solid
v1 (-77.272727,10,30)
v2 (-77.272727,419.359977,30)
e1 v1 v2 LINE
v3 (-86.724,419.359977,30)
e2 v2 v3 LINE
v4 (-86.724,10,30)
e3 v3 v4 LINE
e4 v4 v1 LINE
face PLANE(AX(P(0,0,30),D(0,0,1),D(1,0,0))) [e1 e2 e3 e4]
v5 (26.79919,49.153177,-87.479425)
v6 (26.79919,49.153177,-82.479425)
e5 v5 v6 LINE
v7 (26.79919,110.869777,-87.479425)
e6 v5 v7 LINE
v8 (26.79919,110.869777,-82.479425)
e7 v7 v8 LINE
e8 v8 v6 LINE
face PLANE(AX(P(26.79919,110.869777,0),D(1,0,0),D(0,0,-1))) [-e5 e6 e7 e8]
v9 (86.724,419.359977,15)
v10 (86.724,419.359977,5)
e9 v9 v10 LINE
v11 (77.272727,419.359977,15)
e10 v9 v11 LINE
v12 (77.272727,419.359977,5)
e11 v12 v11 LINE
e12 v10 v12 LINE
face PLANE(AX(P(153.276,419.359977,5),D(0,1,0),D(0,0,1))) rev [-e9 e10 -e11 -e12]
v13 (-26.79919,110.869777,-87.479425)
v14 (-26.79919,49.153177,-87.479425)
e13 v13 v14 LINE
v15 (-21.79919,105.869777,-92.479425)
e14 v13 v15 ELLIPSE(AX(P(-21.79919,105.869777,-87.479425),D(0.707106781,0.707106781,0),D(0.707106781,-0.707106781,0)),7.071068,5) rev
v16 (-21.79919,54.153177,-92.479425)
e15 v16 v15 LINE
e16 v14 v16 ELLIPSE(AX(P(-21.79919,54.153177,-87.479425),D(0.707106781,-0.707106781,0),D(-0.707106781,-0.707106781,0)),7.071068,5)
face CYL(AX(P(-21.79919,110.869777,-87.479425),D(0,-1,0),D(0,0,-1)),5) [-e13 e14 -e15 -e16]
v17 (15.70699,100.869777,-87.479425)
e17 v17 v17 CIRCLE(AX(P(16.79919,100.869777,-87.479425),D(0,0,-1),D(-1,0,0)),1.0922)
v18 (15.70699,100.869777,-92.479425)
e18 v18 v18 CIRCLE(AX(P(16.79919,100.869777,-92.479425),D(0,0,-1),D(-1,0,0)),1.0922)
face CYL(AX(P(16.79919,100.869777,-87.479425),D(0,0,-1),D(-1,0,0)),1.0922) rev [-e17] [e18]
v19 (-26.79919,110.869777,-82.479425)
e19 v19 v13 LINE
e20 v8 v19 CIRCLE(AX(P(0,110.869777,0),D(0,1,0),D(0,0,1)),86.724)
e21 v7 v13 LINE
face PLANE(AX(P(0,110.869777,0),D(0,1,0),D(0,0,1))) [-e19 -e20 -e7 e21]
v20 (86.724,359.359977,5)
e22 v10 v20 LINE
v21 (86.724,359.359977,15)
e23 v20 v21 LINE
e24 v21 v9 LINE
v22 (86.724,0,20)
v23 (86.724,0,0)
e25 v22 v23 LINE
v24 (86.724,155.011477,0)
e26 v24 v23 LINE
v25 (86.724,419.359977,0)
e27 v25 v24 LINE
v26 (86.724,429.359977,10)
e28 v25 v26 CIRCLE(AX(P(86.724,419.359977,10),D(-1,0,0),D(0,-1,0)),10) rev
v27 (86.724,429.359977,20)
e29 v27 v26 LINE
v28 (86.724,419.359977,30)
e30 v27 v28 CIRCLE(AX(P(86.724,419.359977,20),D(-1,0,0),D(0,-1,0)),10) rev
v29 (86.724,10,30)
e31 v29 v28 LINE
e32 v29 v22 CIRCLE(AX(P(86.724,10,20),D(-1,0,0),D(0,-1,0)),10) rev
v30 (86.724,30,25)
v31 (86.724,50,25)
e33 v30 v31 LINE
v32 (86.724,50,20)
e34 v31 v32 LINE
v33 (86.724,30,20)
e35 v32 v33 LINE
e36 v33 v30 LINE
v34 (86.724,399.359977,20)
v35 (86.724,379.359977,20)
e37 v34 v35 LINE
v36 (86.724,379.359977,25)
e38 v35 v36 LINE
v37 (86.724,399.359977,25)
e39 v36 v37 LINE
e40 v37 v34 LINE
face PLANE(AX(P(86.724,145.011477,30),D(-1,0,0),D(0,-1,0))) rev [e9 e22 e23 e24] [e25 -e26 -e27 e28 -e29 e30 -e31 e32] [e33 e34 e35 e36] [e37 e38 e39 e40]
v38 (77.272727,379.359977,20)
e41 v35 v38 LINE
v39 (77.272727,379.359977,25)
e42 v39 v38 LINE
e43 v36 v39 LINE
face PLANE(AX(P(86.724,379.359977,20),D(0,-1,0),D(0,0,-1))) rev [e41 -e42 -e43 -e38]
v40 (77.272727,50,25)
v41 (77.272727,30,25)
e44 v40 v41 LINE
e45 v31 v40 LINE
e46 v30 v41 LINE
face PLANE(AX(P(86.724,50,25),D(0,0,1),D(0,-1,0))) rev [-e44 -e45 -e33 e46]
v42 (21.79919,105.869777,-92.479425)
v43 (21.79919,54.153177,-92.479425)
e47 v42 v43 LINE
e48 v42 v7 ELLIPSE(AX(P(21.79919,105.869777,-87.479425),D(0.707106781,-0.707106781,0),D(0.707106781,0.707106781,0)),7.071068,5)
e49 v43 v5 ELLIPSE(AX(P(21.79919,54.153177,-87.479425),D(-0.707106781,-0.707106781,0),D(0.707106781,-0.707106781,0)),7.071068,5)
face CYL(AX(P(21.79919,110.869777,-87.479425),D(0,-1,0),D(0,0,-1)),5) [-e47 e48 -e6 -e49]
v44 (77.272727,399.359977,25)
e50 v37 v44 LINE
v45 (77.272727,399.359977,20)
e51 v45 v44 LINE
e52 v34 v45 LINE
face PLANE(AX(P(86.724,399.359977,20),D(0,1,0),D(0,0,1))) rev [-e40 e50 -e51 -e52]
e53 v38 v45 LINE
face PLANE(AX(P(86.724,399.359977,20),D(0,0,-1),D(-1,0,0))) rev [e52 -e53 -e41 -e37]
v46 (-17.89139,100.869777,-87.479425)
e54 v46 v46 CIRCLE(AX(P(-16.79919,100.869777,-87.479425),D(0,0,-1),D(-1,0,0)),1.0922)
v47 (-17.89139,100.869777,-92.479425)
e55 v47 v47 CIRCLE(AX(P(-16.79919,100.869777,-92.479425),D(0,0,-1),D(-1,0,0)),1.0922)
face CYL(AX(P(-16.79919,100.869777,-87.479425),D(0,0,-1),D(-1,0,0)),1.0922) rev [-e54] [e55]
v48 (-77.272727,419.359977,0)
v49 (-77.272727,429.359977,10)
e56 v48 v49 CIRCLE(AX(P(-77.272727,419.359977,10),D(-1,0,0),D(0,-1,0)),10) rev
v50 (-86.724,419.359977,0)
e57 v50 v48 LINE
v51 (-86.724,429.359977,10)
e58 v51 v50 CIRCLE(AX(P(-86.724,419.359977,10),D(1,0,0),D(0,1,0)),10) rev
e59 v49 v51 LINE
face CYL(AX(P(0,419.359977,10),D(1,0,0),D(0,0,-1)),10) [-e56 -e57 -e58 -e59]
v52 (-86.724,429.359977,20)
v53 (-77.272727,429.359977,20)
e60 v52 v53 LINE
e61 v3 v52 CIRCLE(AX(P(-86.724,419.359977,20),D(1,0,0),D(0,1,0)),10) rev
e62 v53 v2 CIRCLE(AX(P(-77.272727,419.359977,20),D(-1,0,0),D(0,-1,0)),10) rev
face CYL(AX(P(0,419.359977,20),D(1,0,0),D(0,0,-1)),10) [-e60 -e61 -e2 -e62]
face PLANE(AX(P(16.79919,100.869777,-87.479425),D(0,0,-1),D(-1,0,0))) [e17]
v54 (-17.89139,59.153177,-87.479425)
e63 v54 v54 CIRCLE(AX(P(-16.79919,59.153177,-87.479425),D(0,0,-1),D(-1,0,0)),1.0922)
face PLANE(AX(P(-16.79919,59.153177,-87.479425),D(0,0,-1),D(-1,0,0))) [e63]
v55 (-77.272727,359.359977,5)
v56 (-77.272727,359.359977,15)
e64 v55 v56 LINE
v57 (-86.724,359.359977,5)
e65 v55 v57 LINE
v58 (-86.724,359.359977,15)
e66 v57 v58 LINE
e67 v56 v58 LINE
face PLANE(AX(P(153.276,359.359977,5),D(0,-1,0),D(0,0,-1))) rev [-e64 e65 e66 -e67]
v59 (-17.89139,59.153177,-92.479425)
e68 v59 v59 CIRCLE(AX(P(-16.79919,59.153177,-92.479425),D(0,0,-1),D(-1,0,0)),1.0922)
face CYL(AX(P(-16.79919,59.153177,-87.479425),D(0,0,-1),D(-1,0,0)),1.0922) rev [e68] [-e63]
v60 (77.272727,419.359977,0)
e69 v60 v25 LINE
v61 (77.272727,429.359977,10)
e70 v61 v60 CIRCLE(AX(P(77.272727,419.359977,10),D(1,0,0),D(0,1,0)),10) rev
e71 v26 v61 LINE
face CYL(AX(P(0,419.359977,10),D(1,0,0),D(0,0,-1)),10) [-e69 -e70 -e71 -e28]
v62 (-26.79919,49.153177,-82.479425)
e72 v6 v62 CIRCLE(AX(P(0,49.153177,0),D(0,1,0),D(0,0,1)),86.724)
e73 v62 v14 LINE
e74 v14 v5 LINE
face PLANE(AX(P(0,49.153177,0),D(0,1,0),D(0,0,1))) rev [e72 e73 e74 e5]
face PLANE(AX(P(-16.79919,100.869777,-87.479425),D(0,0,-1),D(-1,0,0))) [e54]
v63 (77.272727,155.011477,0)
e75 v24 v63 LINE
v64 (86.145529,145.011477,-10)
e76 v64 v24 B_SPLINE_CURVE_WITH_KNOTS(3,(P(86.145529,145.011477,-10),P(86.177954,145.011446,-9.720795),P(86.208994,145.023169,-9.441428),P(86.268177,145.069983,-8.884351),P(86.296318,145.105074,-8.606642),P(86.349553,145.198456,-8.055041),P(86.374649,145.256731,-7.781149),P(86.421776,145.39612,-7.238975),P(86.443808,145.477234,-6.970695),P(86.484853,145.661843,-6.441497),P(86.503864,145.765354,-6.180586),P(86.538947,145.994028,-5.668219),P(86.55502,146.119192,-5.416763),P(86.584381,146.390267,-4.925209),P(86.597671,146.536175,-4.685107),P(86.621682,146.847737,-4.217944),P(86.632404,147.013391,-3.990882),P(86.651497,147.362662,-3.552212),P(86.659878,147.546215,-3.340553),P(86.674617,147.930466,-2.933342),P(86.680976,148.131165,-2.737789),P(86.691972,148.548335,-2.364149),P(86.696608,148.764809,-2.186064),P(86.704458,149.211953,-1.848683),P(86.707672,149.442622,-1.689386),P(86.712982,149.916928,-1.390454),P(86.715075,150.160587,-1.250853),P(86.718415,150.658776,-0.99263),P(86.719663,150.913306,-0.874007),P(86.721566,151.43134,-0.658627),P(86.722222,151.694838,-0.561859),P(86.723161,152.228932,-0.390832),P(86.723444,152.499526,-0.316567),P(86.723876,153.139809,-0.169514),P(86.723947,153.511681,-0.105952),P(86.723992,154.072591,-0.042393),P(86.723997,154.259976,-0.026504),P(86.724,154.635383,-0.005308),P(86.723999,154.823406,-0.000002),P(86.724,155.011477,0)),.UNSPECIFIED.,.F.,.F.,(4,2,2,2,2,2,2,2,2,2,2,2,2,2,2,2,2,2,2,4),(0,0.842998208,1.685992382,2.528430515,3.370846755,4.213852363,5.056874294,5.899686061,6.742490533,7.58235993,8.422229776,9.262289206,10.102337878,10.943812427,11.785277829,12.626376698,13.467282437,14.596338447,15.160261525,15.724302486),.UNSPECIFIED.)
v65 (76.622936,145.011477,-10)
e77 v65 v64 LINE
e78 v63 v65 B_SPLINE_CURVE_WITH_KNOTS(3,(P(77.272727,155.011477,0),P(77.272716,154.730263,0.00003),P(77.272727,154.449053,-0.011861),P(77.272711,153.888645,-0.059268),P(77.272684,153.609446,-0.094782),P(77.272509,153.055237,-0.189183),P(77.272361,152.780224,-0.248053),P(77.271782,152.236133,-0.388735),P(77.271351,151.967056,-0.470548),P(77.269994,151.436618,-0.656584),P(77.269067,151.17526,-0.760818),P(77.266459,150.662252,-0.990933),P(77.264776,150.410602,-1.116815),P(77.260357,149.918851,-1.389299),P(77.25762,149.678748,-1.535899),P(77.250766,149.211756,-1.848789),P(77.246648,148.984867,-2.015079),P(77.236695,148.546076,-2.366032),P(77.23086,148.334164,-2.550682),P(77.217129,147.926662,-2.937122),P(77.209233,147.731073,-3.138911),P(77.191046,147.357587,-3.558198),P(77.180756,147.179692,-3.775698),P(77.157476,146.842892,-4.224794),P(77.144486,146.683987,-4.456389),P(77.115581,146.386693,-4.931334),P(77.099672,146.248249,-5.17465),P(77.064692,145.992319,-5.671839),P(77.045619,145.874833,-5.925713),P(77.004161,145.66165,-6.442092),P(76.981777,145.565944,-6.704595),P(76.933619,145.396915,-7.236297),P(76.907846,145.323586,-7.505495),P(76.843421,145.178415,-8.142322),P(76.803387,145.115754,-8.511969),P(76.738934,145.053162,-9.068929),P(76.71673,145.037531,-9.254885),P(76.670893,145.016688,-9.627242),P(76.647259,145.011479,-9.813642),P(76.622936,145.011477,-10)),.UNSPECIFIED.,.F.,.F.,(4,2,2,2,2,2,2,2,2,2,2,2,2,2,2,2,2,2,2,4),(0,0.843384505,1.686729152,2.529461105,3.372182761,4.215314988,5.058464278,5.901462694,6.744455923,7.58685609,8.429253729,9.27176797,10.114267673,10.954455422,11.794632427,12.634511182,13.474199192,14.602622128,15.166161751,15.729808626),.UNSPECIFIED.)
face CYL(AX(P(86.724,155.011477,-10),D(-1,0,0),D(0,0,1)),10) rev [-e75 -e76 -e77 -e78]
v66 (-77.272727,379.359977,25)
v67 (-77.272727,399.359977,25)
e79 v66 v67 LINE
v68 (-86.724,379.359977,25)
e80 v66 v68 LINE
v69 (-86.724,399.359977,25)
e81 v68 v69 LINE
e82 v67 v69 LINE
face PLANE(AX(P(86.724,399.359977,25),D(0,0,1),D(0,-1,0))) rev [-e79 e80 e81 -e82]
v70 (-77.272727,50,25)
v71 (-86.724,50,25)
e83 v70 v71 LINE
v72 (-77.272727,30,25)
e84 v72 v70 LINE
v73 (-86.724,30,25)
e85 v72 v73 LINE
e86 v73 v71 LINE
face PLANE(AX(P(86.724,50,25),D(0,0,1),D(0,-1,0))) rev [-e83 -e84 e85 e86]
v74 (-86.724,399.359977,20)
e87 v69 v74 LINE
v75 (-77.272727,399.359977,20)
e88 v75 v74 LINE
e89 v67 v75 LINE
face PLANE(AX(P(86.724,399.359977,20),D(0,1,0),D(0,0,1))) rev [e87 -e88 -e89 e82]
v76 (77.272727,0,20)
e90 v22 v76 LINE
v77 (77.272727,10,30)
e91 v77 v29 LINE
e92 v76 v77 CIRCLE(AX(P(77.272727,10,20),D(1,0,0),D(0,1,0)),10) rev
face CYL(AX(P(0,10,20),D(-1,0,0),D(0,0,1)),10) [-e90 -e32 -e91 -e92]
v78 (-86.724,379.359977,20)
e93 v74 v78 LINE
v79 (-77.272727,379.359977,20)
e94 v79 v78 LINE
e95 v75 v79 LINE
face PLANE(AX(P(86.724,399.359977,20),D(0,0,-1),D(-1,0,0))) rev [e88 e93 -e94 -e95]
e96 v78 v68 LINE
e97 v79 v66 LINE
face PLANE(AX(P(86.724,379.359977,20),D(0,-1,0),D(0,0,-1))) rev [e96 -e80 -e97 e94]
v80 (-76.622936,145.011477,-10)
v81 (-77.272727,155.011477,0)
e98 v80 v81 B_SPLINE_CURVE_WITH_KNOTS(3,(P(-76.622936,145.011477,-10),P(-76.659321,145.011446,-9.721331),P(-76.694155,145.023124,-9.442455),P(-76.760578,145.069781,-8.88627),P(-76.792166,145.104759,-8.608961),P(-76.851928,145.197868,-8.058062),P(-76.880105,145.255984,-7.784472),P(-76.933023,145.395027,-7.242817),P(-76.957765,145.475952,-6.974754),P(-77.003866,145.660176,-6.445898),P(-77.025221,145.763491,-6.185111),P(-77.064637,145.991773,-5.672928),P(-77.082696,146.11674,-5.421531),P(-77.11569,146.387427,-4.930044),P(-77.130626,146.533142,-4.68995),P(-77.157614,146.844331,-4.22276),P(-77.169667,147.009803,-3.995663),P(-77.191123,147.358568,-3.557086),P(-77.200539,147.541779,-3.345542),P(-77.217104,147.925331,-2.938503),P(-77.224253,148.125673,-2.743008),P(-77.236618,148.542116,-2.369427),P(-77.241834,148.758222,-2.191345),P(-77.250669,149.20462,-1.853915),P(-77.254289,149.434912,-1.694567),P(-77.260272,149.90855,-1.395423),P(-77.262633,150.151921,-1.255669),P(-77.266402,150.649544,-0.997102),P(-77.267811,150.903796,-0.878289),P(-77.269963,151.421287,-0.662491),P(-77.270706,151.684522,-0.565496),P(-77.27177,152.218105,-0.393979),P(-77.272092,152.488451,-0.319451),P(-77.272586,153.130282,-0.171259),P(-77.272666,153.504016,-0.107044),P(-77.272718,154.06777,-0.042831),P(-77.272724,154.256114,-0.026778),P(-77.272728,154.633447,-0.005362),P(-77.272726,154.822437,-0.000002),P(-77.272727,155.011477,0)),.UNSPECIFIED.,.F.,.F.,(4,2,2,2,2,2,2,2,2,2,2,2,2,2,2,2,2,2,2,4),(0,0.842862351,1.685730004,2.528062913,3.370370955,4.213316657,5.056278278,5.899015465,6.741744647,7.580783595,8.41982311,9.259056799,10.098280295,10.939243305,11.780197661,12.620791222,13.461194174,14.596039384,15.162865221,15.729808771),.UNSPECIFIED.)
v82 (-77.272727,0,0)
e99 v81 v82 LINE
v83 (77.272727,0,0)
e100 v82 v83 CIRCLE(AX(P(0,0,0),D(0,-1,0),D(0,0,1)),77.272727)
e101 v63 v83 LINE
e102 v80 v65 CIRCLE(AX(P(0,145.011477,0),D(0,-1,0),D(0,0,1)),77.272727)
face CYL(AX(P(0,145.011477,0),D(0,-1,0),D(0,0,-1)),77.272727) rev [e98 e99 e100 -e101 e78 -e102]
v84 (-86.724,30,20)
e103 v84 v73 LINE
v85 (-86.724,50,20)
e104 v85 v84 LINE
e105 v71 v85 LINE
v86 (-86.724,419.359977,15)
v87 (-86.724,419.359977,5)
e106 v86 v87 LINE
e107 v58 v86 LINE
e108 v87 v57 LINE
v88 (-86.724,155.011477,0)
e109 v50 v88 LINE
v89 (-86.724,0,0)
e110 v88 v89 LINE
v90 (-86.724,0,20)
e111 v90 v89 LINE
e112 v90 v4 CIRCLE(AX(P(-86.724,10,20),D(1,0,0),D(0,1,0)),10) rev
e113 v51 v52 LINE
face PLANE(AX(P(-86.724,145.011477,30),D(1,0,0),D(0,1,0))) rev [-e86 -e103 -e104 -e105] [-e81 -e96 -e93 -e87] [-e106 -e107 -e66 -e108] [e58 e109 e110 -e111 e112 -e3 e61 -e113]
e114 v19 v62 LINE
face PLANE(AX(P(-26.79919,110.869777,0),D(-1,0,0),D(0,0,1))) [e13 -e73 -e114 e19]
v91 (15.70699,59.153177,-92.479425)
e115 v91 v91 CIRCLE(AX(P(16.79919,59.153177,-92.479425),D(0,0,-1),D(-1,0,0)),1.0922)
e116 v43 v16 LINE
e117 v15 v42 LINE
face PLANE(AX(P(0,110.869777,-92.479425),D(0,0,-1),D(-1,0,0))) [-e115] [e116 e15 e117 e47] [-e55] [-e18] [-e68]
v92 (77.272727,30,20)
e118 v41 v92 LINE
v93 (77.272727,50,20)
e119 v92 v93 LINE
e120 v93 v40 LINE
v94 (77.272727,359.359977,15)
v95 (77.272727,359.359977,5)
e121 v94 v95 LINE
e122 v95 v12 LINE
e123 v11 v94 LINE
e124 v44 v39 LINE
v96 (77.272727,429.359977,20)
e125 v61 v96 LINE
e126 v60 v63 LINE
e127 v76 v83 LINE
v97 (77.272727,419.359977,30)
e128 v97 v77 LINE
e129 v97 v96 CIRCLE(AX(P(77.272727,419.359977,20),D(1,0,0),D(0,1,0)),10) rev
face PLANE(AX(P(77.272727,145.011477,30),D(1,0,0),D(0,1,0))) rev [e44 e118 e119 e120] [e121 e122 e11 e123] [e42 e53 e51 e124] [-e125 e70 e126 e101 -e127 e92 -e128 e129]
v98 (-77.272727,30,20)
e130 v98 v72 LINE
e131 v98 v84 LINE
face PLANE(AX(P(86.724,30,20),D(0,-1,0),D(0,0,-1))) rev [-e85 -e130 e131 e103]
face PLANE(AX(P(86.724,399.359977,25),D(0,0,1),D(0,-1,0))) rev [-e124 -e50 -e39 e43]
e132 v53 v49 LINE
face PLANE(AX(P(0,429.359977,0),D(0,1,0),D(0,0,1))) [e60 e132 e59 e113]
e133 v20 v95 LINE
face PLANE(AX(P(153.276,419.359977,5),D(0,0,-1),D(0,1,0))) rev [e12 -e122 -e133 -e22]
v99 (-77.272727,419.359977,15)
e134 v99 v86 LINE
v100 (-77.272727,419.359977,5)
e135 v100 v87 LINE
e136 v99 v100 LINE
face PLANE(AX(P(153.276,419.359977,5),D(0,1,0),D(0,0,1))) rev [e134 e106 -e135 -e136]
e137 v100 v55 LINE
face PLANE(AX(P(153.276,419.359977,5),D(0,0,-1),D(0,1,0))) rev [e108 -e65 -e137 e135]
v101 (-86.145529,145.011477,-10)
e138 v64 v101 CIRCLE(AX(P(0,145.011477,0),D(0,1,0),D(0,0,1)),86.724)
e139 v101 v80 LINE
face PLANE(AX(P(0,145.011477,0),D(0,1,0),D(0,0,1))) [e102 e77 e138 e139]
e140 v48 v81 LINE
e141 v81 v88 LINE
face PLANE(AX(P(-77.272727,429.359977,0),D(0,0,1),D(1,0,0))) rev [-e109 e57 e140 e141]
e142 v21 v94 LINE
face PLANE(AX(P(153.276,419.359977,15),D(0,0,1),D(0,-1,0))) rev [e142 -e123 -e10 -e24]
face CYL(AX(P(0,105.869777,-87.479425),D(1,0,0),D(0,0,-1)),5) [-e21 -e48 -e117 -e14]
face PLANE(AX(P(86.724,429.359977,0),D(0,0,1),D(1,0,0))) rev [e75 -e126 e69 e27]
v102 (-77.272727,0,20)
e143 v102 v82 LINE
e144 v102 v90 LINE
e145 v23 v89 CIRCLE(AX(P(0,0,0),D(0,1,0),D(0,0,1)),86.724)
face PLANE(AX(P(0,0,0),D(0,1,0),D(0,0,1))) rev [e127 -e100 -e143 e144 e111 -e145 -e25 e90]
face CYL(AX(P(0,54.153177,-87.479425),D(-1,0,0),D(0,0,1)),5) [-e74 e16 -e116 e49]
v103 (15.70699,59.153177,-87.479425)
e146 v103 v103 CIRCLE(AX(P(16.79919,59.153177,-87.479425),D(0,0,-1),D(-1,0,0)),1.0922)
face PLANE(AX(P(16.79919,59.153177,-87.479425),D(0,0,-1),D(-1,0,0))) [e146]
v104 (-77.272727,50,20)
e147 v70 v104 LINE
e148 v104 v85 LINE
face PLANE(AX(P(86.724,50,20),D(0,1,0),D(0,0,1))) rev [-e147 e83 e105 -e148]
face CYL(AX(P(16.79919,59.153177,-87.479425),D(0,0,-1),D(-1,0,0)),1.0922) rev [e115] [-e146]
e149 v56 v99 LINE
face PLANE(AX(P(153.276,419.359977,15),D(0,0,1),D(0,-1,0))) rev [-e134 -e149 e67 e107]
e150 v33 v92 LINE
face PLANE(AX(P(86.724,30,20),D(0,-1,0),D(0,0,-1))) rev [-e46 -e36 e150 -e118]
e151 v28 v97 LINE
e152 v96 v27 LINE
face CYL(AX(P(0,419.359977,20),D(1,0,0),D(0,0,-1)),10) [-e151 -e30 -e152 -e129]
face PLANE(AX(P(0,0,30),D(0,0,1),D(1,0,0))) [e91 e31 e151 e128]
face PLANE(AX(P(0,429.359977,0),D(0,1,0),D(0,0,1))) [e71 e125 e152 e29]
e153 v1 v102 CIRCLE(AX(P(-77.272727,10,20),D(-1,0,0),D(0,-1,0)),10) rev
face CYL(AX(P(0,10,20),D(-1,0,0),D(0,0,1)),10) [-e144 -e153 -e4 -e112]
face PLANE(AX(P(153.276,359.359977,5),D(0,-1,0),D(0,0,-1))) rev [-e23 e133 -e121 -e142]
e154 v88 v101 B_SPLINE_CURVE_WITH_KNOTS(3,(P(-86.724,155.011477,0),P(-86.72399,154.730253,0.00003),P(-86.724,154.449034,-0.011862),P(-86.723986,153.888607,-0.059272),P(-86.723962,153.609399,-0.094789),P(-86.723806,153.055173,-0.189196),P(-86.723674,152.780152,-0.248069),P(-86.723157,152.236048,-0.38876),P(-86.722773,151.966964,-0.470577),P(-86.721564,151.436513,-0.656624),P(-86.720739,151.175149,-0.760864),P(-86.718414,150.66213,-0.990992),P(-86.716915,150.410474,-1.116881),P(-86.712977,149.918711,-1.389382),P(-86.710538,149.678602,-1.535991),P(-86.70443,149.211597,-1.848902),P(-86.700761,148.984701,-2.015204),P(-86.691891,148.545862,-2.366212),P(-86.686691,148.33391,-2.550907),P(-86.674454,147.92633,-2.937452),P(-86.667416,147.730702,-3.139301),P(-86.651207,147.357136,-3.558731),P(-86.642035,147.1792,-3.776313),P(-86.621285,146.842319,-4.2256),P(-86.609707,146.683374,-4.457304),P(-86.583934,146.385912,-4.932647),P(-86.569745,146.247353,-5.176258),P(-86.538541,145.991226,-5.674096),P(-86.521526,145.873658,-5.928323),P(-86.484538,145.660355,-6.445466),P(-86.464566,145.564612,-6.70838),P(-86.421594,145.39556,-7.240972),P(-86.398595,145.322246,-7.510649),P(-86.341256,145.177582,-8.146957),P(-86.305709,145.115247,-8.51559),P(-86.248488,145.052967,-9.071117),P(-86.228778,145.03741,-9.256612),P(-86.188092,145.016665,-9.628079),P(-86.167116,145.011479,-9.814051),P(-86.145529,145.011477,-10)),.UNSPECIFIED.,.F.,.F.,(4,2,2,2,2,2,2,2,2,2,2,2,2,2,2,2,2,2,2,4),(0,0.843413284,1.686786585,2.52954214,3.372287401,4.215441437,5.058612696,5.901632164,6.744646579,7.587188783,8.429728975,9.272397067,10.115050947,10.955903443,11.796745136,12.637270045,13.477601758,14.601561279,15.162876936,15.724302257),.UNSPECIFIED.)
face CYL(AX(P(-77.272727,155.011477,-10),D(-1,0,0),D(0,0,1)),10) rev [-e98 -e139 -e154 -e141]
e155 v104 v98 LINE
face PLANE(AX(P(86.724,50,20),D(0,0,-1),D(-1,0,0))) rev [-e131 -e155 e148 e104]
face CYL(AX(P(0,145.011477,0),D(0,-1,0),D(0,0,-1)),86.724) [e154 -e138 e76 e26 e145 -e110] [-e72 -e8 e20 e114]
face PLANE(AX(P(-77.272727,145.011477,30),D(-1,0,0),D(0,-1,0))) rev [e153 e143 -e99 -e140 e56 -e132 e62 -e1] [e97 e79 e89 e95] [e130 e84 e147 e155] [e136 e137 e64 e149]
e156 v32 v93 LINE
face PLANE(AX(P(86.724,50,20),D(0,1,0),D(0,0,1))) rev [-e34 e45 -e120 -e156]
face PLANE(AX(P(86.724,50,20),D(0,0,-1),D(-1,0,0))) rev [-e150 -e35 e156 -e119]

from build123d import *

# Parameters (mm, degrees)
BOSS_EXTRUDE1_DEPTH = 145.01147666
SKETCH2_W           = 9.451272727
SKETCH2_H           = 145.01147666
BOSS_EXTRUDE2_DEPTH = 30
SKETCH3_W           = 9.451272727
SKETCH3_H           = 30
BOSS_EXTRUDE3_DEPTH = 284.3485
SKETCH5_W           = 10
SKETCH5_H           = 60
CUT_EXTRUDE1_DEPTH  = 240
SKETCH6_W           = 5
SKETCH6_H           = 20
CUT_EXTRUDE2_DEPTH  = 472.121269354
FILLET1_R           = 10
FILLET2_R           = 10
FILLET3_R           = 10
SKETCH8_W           = 5
SKETCH8_H           = 20
CUT_EXTRUDE3_DEPTH  = 472.121269409
BOSS_EXTRUDE4_DEPTH = 30.8583
FILLET4_R           = 5
SKETCH10_R          = 1.0922
CUT_EXTRUDE4_DEPTH  = 5


with BuildPart() as part:
    # Sketch1 → Boss-Extrude1 (new body)
    with BuildSketch(Plane(origin=(0, 0, 0), x_dir=(1, 0, 0), z_dir=(0, 1, 0))):
        with BuildLine():
            Line((-77.272727273, 0), (-86.724, 0))
            ThreePointArc((-86.724, 0), (0, 86.724), (86.724, 0))
            Line((86.724, 0), (77.272727273, 0))
            ThreePointArc((77.272727273, 0), (0, 77.272727273), (-77.272727273, 0))
        make_face()
    extrude(amount=BOSS_EXTRUDE1_DEPTH)

    # Sketch2 → Boss-Extrude2 (add)
    with BuildSketch(Plane.XY):
        with Locations((81.998363637, 72.50573833)):
            Rectangle(SKETCH2_W, SKETCH2_H)
        with Locations((-81.998363637, 72.50573833)):
            Rectangle(SKETCH2_W, SKETCH2_H)
    extrude(amount=BOSS_EXTRUDE2_DEPTH)

    # Sketch3 → Boss-Extrude3 (add)
    with BuildSketch(Plane(origin=(0, 145.01147666, 0), x_dir=(1, 0, 0), z_dir=(0, 1, 0))):
        with Locations((-81.998363637, -15)):
            Rectangle(SKETCH3_W, SKETCH3_H)
        with Locations((81.998363637, -15)):
            Rectangle(SKETCH3_W, SKETCH3_H)
    extrude(amount=BOSS_EXTRUDE3_DEPTH)

    # Sketch5 → Cut-Extrude1 (cut)
    with BuildSketch(Plane.ZY.offset(86.724)):
        with Locations((10, 389.35997666)):
            Rectangle(SKETCH5_W, SKETCH5_H)
    extrude(amount=-CUT_EXTRUDE1_DEPTH, mode=Mode.SUBTRACT)

    # Sketch6 → Cut-Extrude2 (cut, through all)
    with BuildSketch(Plane.ZY.offset(86.724)):
        with Locations((22.5, 389.35997666)):
            Rectangle(SKETCH6_W, SKETCH6_H)
    extrude(amount=-CUT_EXTRUDE2_DEPTH, mode=Mode.SUBTRACT)

    # Fillet1
    fillet1_edges = [part.edges().sort_by_distance(p)[0] for p in [
        (-81.998363636, 429.35997666, 0),
        (-81.998363636, 429.35997666, 30),
        (81.998363636, 429.35997666, 0),
        (81.998363636, 429.35997666, 30),
    ]]
    fillet(fillet1_edges, radius=FILLET1_R)

    # Fillet2
    fillet2_edges = [part.edges().sort_by_distance(p)[0] for p in [
        (81.998363636, 0, 30),
        (-81.998363636, 0, 30),
    ]]
    fillet(fillet2_edges, radius=FILLET2_R)

    # Fillet3
    # the kernel refuses this fillet: 10 mm, written as the material it adds along each edge
    with BuildSketch(Plane(origin=(-111.724, 145.01147666, 0), x_dir=(0, 1, 0), z_dir=(1, 0, 0))) as fillet3_piece_1_section:
        with BuildLine():
            CenterArc((FILLET3_R, -FILLET3_R), FILLET3_R, 90, 90)
            Line((0, -FILLET3_R), (0, 0))
            Line((0, 0), (FILLET3_R, 0))
        make_face()
    fillet3_piece_1 = extrude(amount=59.451272727, mode=Mode.PRIVATE)
    fillet3_piece_1 = fillet3_piece_1 & Plane(origin=(0, 147.252284307, 0), x_dir=(-1, 0, 0), z_dir=(0, -1, 0)) * Cylinder(86.724, 159, mode=Mode.PRIVATE)
    fillet3_piece_1 = fillet3_piece_1 - Plane(origin=(0, 147.252284307, 0), x_dir=(1, 0, 0), z_dir=(0, -1, 0)) * Cylinder(77.272727273, 159, mode=Mode.PRIVATE)
    add(fillet3_piece_1)
    with BuildSketch(Plane(origin=(52.272727273, 145.01147666, 0), x_dir=(0, 0, -1), z_dir=(1, 0, 0))) as fillet3_piece_2_section:
        with BuildLine():
            CenterArc((FILLET3_R, FILLET3_R), FILLET3_R, 180, 90)
            Line((0, FILLET3_R), (0, 0))
            Line((0, 0), (FILLET3_R, 0))
        make_face()
    fillet3_piece_2 = extrude(amount=59.451272727, mode=Mode.PRIVATE)
    fillet3_piece_2 = fillet3_piece_2 & Plane(origin=(0, 145.87973925, 0), x_dir=(-1, 0, 0), z_dir=(0, -1, 0)) * Cylinder(86.724, 159, mode=Mode.PRIVATE)
    fillet3_piece_2 = fillet3_piece_2 - Plane(origin=(0, 145.87973925, 0), x_dir=(1, 0, 0), z_dir=(0, -1, 0)) * Cylinder(77.272727273, 159, mode=Mode.PRIVATE)
    add(fillet3_piece_2)

    # Sketch8 → Cut-Extrude3 (cut, through all)
    with BuildSketch(Plane.ZY.offset(86.724)):
        with Locations((22.5, 40)):
            Rectangle(SKETCH8_W, SKETCH8_H)
    extrude(amount=-CUT_EXTRUDE3_DEPTH, mode=Mode.SUBTRACT)

    # Sketch9 → Boss-Extrude4 (add, symmetric)
    with BuildSketch(Plane(origin=(0, 80.01147666, 0), x_dir=(1, 0, 0), z_dir=(0, 1, 0))):
        with BuildLine():
            Line((-26.79918982, 92.479425319), (-26.79918982, 82.479425319))
            ThreePointArc((-26.79918982, 82.479425319), (0, 86.724), (26.79918982, 82.479425319))
            Line((26.79918982, 82.479425319), (26.79918982, 92.479425319))
            Line((26.79918982, 92.479425319), (-26.79918982, 92.479425319))
        make_face()
    extrude(amount=BOSS_EXTRUDE4_DEPTH, both=True)

    # Fillet4
    fillet4_edges = [part.edges().sort_by_distance(p)[0] for p in [
        (0, 110.86977666, -92.479425319),
        (26.79918982, 80.01147666, -92.479425319),
        (-26.79918982, 80.01147666, -92.479425319),
        (0, 49.15317666, -92.479425319),
    ]]
    fillet(fillet4_edges, radius=FILLET4_R)

    # Sketch10 → Cut-Extrude4 (cut)
    with BuildSketch(Plane(origin=(0, 0, -92.479425319), x_dir=(-1, 0, 0), z_dir=(0, 0, -1))):
        with Locations((-16.79918982, 100.86977666)):
            Circle(SKETCH10_R)
        with Locations((16.79918982, 100.86977666)):
            Circle(SKETCH10_R)
        with Locations((-16.79918982, 59.15317666)):
            Circle(SKETCH10_R)
        with Locations((16.79918982, 59.15317666)):
            Circle(SKETCH10_R)
    extrude(amount=-CUT_EXTRUDE4_DEPTH, mode=Mode.SUBTRACT)


solid = part.part
